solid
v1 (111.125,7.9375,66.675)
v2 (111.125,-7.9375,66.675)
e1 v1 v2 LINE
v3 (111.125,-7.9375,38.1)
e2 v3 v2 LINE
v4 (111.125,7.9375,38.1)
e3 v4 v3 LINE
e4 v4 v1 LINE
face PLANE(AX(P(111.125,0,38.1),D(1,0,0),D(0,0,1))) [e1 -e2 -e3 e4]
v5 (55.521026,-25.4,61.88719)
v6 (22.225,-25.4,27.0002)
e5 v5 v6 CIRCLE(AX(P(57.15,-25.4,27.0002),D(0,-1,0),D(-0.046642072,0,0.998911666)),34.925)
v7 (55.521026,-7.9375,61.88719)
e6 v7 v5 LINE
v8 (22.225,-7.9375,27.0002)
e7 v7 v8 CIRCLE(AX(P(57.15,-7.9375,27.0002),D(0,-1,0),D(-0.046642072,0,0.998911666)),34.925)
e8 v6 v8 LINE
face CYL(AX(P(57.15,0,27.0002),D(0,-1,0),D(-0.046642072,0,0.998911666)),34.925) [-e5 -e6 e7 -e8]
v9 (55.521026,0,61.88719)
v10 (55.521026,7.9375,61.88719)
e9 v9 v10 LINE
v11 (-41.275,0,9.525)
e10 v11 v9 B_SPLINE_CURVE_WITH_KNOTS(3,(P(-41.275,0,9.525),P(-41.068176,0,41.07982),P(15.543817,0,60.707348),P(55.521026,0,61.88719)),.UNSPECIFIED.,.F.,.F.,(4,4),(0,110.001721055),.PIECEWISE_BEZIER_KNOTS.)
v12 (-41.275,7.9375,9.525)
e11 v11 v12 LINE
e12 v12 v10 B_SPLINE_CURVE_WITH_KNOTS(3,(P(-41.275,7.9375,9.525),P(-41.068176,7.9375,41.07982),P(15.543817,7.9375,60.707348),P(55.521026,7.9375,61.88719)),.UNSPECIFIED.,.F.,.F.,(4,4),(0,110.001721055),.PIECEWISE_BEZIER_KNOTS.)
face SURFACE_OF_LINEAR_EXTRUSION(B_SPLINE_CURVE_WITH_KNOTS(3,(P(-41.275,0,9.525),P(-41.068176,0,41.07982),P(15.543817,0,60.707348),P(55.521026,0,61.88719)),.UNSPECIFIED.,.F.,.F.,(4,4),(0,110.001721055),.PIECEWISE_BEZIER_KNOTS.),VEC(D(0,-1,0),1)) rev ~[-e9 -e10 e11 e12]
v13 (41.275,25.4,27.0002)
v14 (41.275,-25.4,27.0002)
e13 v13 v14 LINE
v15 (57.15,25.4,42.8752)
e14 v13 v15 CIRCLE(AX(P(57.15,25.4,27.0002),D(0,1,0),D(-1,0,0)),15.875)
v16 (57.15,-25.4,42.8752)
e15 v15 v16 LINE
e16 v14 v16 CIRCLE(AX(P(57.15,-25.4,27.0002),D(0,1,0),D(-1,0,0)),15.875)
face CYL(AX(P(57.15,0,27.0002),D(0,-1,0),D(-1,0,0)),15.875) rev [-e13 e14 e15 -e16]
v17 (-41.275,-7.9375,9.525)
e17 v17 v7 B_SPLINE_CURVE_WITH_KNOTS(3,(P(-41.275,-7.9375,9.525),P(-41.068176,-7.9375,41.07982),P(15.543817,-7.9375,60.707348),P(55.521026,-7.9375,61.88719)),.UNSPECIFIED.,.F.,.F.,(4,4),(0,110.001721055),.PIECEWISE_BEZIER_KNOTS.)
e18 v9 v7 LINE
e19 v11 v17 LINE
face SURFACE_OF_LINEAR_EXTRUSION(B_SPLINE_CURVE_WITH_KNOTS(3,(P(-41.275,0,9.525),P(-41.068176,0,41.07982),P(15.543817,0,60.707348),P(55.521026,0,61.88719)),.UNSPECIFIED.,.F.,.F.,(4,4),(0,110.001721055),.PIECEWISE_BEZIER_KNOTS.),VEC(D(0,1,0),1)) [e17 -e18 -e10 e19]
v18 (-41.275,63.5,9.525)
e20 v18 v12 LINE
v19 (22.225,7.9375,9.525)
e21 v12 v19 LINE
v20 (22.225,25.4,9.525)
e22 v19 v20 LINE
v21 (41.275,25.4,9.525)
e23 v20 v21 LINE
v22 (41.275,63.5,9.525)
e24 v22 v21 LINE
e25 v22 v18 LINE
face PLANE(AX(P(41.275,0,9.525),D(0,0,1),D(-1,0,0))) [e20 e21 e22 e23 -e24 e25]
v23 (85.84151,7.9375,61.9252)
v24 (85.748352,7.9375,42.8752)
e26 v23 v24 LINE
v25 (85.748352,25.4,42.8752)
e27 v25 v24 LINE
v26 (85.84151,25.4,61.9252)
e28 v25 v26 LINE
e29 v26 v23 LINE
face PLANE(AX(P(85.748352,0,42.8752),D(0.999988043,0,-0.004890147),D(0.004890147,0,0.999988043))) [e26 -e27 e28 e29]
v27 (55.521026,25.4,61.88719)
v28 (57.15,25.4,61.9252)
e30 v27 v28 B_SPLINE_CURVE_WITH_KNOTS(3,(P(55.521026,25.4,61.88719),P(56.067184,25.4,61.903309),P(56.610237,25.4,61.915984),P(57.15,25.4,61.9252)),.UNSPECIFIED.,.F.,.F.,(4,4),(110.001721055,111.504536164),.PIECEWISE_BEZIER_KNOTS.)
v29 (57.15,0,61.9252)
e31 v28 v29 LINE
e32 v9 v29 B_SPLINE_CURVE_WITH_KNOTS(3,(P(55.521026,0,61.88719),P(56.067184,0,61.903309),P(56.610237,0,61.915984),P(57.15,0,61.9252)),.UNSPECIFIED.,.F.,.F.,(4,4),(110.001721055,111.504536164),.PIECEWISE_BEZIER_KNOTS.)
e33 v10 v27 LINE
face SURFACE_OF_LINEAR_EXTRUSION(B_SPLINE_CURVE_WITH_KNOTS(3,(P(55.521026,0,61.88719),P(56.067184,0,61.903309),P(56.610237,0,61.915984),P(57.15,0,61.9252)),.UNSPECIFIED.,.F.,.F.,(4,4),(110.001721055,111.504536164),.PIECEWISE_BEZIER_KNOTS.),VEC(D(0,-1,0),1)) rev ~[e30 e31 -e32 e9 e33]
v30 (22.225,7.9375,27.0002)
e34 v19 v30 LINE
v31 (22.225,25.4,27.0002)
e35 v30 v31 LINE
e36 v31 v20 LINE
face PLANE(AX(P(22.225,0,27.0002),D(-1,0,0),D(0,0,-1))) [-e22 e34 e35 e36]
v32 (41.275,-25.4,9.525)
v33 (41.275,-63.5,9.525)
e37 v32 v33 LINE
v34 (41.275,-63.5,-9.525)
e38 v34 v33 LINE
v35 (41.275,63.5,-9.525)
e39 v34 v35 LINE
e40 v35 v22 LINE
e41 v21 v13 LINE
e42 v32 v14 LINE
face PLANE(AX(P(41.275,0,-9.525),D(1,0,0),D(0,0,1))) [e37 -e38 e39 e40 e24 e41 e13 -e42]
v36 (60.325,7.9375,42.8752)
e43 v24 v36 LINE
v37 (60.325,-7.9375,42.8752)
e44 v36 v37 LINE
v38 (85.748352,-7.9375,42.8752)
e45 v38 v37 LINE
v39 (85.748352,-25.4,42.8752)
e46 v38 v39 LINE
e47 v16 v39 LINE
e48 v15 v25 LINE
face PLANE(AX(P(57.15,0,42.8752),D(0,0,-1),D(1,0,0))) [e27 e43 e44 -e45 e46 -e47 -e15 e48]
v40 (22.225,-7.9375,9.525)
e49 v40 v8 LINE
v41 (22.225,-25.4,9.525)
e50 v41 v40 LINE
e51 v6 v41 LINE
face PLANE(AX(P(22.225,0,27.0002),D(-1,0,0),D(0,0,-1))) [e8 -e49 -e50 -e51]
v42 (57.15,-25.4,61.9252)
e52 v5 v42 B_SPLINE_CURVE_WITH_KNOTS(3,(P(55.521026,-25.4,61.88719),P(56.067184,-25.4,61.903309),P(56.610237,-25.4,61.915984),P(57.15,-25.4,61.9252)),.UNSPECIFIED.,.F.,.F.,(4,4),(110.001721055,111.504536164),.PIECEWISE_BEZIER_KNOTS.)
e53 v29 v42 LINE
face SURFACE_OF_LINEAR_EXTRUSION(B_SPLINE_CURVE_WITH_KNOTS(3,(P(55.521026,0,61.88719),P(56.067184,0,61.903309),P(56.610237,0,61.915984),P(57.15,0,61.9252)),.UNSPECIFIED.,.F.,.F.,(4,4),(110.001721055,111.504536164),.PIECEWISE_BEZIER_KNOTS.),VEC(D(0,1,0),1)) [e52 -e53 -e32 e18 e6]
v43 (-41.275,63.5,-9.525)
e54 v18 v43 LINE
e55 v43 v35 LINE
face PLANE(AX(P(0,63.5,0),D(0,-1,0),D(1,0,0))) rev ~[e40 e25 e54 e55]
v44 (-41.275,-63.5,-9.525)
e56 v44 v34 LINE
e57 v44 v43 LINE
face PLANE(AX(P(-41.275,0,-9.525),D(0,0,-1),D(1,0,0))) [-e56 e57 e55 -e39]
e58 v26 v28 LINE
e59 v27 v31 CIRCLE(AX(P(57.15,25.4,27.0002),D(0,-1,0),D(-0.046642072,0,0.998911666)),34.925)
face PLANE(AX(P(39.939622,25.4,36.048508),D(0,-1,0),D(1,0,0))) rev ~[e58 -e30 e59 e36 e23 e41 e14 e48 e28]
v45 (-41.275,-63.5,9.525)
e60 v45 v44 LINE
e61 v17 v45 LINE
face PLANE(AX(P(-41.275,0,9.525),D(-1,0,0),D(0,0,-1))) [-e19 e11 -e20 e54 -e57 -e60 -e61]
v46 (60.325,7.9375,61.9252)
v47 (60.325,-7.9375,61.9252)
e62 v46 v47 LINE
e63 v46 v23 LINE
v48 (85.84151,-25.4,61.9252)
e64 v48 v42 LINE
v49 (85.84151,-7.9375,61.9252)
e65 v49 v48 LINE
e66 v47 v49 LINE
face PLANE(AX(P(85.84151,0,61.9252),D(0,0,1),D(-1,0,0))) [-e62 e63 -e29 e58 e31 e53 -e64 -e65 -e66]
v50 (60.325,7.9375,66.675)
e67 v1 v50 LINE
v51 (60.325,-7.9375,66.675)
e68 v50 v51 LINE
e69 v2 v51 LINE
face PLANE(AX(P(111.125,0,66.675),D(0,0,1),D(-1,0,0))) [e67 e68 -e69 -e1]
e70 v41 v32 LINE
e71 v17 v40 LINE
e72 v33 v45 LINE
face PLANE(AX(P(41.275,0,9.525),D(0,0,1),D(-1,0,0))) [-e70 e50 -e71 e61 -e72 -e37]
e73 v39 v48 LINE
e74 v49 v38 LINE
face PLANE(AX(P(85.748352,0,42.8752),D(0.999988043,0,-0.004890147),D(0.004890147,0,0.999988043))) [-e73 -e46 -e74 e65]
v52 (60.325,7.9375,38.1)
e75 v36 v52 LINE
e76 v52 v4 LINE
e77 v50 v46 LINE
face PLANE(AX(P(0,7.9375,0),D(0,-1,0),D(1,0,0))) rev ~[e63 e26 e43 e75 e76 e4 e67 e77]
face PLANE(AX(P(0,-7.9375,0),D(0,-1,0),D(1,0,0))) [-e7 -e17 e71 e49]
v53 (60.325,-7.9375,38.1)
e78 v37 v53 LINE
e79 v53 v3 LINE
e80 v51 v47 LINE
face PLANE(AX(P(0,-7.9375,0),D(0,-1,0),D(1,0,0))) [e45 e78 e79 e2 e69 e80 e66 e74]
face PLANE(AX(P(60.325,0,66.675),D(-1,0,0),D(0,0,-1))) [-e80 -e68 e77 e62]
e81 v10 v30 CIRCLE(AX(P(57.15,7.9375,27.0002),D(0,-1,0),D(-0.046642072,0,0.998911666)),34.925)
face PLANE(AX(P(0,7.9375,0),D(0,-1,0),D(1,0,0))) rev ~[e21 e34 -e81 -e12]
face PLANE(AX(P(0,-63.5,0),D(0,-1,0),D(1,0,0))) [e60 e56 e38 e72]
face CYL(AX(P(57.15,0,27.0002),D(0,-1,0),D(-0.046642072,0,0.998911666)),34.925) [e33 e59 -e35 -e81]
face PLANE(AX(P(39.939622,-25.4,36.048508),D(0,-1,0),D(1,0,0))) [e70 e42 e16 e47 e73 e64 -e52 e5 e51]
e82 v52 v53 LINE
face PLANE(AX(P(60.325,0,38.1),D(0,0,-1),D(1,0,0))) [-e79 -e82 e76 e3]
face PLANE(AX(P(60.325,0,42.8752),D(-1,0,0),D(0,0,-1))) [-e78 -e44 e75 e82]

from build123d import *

# Parameters (mm, degrees)
F1_DEPTH = 63.5
F2_DEPTH = 25.4
F3_DEPTH = 7.9375


with BuildPart() as f1:
    # F0 (on Front) → F1 (new body, symmetric)
    with BuildSketch(Plane.XZ):
        Polygon((41.275, -9.525), (41.275, 9.525), (22.225, 9.525), (-41.275, 9.525), (-41.275, -9.525), align=None)
    extrude(amount=F1_DEPTH, both=True)

    # F0 (on Front) → F2 (join, symmetric)
    with BuildSketch(Plane.XZ):
        with BuildLine():
            Line((22.225, 9.525), (41.275, 9.525))
            Line((41.275, 9.525), (41.275, 27.0002))
            ThreePointArc((41.275, 27.0002), (45.9246798487, 38.2255201513), (57.15, 42.8752))
            Line((57.15, 42.8752), (60.325, 42.8752))
            Line((60.325, 42.8752), (60.325, 61.9252))
            Line((60.325, 61.9252), (57.15, 61.9252))
            add(Edge.make_bspline(
                [(55.5210256517, 61.8871899471), (56.0671839511, 61.9033086419), (56.6102374814, 61.9159842015), (57.15, 61.9252)],
                knots=[110.0017210547, 110.0017210547, 110.0017210547, 110.0017210547, 111.5045361635, 111.5045361635, 111.5045361635, 111.5045361635], degree=3))
            ThreePointArc((55.5210256517, 61.8871899471), (31.8849297041, 51.1130979582), (22.225, 27.0002))
            Line((22.225, 27.0002), (22.225, 9.525))
        make_face()
        Polygon((60.325, 61.9252), (60.325, 42.8752), (85.7483517106, 42.8752), (85.8415101305, 61.9252), align=None)
    extrude(amount=F2_DEPTH, both=True)

    # F0 (on Front) → F3 (join, symmetric)
    with BuildSketch(Plane.XZ):
        Polygon((41.275, -9.525), (41.275, 9.525), (22.225, 9.525), (-41.275, 9.525), (-41.275, -9.525), align=None)
        with BuildLine():
            Line((22.225, 9.525), (41.275, 9.525))
            Line((41.275, 9.525), (41.275, 27.0002))
            ThreePointArc((41.275, 27.0002), (45.9246798487, 38.2255201513), (57.15, 42.8752))
            Line((57.15, 42.8752), (60.325, 42.8752))
            Line((60.325, 42.8752), (60.325, 61.9252))
            Line((60.325, 61.9252), (57.15, 61.9252))
            add(Edge.make_bspline(
                [(55.5210256517, 61.8871899471), (56.0671839511, 61.9033086419), (56.6102374814, 61.9159842015), (57.15, 61.9252)],
                knots=[110.0017210547, 110.0017210547, 110.0017210547, 110.0017210547, 111.5045361635, 111.5045361635, 111.5045361635, 111.5045361635], degree=3))
            ThreePointArc((55.5210256517, 61.8871899471), (31.8849297041, 51.1130979582), (22.225, 27.0002))
            Line((22.225, 27.0002), (22.225, 9.525))
        make_face()
        with BuildLine():
            Line((-41.275, 9.525), (22.225, 9.525))
            Line((22.225, 9.525), (22.225, 27.0002))
            ThreePointArc((22.225, 27.0002), (31.8849297041, 51.1130979582), (55.5210256517, 61.8871899471))
            add(Edge.make_bspline(
                [(-41.275, 9.525), (-41.0681757543, 41.079819722), (15.5438171721, 60.7073480966), (55.5210256517, 61.8871899471)],
                knots=[0, 0, 0, 0, 110.0017210547, 110.0017210547, 110.0017210547, 110.0017210547], degree=3))
        make_face()
        Polygon((85.7483517106, 42.8752), (60.325, 42.8752), (60.325, 38.1), (85.725, 38.1), align=None)
        Polygon((60.325, 61.9252), (60.325, 42.8752), (85.7483517106, 42.8752), (85.8415101305, 61.9252), align=None)
        Polygon((60.325, 66.675), (60.325, 61.9252), (85.8415101305, 61.9252), (85.8647376299, 66.675), align=None)
        Polygon((85.8415101305, 61.9252), (85.7483517106, 42.8752), (85.725, 38.1), (111.125, 38.1), (111.125, 66.675), (85.8647376299, 66.675), align=None)
    extrude(amount=F3_DEPTH, both=True)


solid = f1.part
